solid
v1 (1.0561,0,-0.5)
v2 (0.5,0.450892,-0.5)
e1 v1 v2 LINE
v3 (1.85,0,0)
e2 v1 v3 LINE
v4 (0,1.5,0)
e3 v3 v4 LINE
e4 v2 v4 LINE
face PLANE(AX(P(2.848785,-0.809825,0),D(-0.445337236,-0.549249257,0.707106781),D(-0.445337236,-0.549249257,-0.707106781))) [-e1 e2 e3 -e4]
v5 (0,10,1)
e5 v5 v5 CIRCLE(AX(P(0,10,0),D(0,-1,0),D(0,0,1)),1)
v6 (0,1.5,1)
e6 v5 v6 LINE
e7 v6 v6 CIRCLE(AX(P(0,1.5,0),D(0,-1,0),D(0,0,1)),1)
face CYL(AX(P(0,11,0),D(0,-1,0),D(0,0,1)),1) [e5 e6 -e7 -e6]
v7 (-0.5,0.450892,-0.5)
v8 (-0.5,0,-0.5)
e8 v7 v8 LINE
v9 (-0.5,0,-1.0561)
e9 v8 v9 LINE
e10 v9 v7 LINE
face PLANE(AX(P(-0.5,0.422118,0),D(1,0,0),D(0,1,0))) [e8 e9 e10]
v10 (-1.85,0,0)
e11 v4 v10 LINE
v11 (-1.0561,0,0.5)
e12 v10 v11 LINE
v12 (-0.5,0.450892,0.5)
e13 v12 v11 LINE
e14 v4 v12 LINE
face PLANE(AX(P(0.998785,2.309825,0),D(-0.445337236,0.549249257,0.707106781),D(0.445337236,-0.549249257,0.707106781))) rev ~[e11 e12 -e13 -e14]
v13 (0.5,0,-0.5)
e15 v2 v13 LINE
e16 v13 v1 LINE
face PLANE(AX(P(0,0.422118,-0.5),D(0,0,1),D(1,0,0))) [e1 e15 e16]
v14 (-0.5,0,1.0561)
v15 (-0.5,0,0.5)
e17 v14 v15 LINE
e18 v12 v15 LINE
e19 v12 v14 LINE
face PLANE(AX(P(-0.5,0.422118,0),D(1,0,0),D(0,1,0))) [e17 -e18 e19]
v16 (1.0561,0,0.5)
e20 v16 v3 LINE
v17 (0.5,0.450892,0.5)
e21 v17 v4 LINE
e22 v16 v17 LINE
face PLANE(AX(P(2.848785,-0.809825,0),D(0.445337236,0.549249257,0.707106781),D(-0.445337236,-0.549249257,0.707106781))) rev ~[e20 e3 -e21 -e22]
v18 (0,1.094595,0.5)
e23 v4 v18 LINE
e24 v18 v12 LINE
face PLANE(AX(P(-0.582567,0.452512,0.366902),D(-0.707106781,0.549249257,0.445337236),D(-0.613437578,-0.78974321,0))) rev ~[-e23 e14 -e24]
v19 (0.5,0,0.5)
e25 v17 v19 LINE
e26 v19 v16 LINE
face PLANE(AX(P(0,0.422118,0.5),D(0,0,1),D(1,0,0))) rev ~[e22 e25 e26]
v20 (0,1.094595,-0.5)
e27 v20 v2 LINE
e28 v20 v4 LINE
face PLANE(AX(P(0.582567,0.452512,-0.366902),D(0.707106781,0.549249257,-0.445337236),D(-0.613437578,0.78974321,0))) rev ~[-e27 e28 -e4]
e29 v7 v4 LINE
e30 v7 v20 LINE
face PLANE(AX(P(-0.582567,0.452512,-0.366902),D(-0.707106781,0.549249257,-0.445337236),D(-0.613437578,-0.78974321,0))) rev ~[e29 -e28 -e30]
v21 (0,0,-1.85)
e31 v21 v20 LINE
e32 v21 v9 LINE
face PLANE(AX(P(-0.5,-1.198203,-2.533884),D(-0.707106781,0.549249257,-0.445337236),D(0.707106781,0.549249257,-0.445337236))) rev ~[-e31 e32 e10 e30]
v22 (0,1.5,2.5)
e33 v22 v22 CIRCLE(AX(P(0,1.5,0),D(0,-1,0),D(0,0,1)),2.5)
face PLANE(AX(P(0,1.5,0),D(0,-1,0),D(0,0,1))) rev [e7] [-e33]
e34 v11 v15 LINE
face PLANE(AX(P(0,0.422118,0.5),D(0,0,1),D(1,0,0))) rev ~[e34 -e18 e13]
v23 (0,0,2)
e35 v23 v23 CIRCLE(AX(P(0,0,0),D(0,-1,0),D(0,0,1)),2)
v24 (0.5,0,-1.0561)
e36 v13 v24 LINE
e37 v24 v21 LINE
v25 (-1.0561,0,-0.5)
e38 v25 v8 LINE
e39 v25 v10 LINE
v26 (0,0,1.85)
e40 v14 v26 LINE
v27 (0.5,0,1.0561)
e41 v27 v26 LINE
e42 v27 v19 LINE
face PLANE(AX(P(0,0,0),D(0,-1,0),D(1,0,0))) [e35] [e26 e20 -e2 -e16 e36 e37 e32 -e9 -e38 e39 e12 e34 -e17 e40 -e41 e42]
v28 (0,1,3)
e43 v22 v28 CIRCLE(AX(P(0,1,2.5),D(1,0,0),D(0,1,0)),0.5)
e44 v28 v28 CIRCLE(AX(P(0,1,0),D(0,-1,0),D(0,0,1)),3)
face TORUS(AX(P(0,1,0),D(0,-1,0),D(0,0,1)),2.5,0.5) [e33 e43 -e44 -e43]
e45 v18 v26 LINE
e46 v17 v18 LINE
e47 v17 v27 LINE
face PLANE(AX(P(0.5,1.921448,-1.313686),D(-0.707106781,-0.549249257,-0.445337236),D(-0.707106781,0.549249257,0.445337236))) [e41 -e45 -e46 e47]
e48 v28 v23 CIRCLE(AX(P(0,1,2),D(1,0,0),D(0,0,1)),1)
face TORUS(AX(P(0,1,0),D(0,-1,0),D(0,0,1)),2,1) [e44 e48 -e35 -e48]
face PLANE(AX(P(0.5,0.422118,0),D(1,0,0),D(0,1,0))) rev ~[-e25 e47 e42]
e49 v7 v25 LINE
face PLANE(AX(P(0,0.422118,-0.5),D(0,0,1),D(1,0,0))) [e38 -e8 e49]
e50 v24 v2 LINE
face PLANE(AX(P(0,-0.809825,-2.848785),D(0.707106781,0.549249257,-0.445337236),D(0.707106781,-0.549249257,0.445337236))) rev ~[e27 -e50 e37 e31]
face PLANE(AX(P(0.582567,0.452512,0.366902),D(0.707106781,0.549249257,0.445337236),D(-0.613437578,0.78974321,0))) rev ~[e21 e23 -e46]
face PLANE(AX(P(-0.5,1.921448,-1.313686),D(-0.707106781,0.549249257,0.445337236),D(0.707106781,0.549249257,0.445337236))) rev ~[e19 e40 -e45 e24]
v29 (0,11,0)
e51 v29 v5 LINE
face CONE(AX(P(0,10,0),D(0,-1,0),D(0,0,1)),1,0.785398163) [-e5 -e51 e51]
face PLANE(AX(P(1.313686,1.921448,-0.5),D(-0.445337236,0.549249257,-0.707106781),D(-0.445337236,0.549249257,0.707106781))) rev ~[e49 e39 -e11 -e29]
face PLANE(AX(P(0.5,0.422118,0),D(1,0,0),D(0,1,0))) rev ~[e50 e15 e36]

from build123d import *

# Parameters (mm, degrees)
F2_SIZE      = 1
F4_DEPTH     = 0.5
F5_T4_DEPTH  = 4.9533840607
F5_T10_DEPTH = 4.9533840607
F5_T16_DEPTH = 4.9533840607
F5_T22_DEPTH = 4.9533840607
F7_DEPTH     = 0.5
F8_T4_DEPTH  = 4.9533840607
F8_T10_DEPTH = 4.9533840607
F8_T16_DEPTH = 4.9533840607
F8_T22_DEPTH = 4.9533840607
F8_T28_DEPTH = 4.9533840607
F8_T34_DEPTH = 4.9533840607
F8_T40_DEPTH = 4.9533840607
F8_T46_DEPTH = 4.9533840607


# Not quite as in the source:
# - a fillet or chamfer that OpenCascade refuses, or shapes differently, is made with other operations: its cross-section is extruded or revolved along the edge and cut away or added


with BuildPart() as f1:
    # F0 (on Right) → F1 (revolve)
    with BuildSketch(Plane.YZ):
        with BuildLine():
            Line((0, 2), (0, 0))
            Line((0, 0), (11, 0))
            Line((11, 0), (11, 1))
            Line((11, 1), (1.5, 1))
            Line((1.5, 1), (1.5, 2.5))
            ThreePointArc((1.5, 2.5), (1.3535533906, 2.8535533906), (1, 3))
            ThreePointArc((1, 3), (0.2928932188, 2.7071067812), (0, 2))
        make_face()
    revolve(axis=Axis((0, -4.3078260496, 0), (0, -1, 0)))

    # F2
    f2_edges = [f1.edges().sort_by_distance(p)[0] for p in [
        (0, 11, -1),
    ]]
    chamfer(f2_edges, length=F2_SIZE)

    # F3 (on Right) → F4 (cut, symmetric)
    with BuildSketch(Plane.YZ):
        Polygon((1.5, 0), (0, 1.85), (0, -1.85), align=None)
    extrude(amount=F4_DEPTH, both=True, mode=Mode.SUBTRACT)

    # F5: chamfer of 0.5 on 4 edges, made by hand


with BuildPart() as f5_tool2:
    # F5_s3 → F5_t4 (new body)
    with BuildSketch(Plane(origin=(0, -1.7148497309, -2.1149813348), x_dir=(1, 0, 0), z_dir=(0, 0.6298019584, 0.7767557487))):
        Polygon((0, 1.1651336231), (0.5, 0.6651336231), (0.5, 1.1651336231), align=None)
    extrude(amount=F5_T4_DEPTH)

    split(bisect_by=Plane.XZ, keep=Keep.BOTTOM)

    split(bisect_by=Plane(origin=(0, 0.9050242398, 0.7338034376), x_dir=(1, 0, 0), z_dir=(0, -0.7767557487, -0.6298019584)), keep=Keep.TOP)


with BuildPart() as f1_1:
    add(f1.part)

    # F5_t1: union F5_tool2
    add(f5_tool2.part)


with BuildPart() as f5_tool8:
    # F5_s9 → F5_t10 (new body)
    with BuildSketch(Plane(origin=(0, -1.7148497309, -2.1149813348), x_dir=(1, 0, 0), z_dir=(0, 0.6298019584, 0.7767557487))):
        Polygon((-0.5, 0.6651336231), (0, 1.1651336231), (-0.5, 1.1651336231), align=None)
    extrude(amount=F5_T10_DEPTH)

    split(bisect_by=Plane.XZ, keep=Keep.BOTTOM)

    split(bisect_by=Plane(origin=(0, 0.9050242398, 0.7338034376), x_dir=(1, 0, 0), z_dir=(0, -0.7767557487, -0.6298019584)), keep=Keep.TOP)


with BuildPart() as f1_2:
    add(f1_1.part)

    # F5_t7: union F5_tool8
    add(f5_tool8.part)


with BuildPart() as f5_tool14:
    # F5_s15 → F5_t16 (new body)
    with BuildSketch(Plane(origin=(0, 1.4048012514, -1.73258821), x_dir=(1, 0, 0), z_dir=(0, -0.6298019584, 0.7767557487))):
        Polygon((-0.5, 0.6651336231), (0, 1.1651336231), (-0.5, 1.1651336231), align=None)
    extrude(amount=F5_T16_DEPTH)

    split(bisect_by=Plane.XZ, keep=Keep.BOTTOM)

    split(bisect_by=Plane(origin=(0, 0.9050242398, -0.7338034376), x_dir=(1, 0, 0), z_dir=(0, -0.7767557487, 0.6298019584)), keep=Keep.TOP)


with BuildPart() as f1_3:
    add(f1_2.part)

    # F5_t13: union F5_tool14
    add(f5_tool14.part)


with BuildPart() as f5_tool20:
    # F5_s21 → F5_t22 (new body)
    with BuildSketch(Plane(origin=(0, 1.4048012514, -1.73258821), x_dir=(1, 0, 0), z_dir=(0, -0.6298019584, 0.7767557487))):
        Polygon((0.5, 0.6651336231), (0, 1.1651336231), (0.5, 1.1651336231), align=None)
    extrude(amount=F5_T22_DEPTH)

    split(bisect_by=Plane.XZ, keep=Keep.BOTTOM)

    split(bisect_by=Plane(origin=(0, 0.9050242398, -0.7338034376), x_dir=(1, 0, 0), z_dir=(0, -0.7767557487, 0.6298019584)), keep=Keep.TOP)


with BuildPart() as f1_4:
    add(f1_3.part)

    # F5_t19: union F5_tool20
    add(f5_tool20.part)

    # F6 (on Top) → F7 (cut, symmetric)
    with BuildSketch(Plane.XY):
        Polygon((0, 1.5), (-1.85, 0), (1.85, 0), align=None)
    extrude(amount=F7_DEPTH, both=True, mode=Mode.SUBTRACT)

    # F8: chamfer of 0.5 on 4 edges, made by hand


with BuildPart() as f8_tool2:
    # F8_s3 → F8_t4 (new body)
    with BuildSketch(Plane(origin=(2.1149813348, -1.7148497309, 0), x_dir=(0, 0, 1), z_dir=(-0.7767557487, 0.6298019584, 0))):
        Polygon((0, 1.1651336231), (-0.5, 0.6651336231), (-0.5, 1.1651336231), align=None)
    extrude(amount=F8_T4_DEPTH)

    split(bisect_by=Plane.XZ, keep=Keep.BOTTOM)

    split(bisect_by=Plane(origin=(0.5825668116, 0.4525121199, -0.3669017188), x_dir=(-0.6134375783, 0.7897432099, 0), z_dir=(0.7071067812, 0.5492492572, -0.4453372356)), keep=Keep.TOP)


with BuildPart() as f1_5:
    add(f1_4.part)

    # F8_t1: union F8_tool2
    add(f8_tool2.part)


with BuildPart() as f8_tool8:
    # F8_s9 → F8_t10 (new body)
    with BuildSketch(Plane(origin=(2.1149813348, -1.7148497309, 0), x_dir=(0, 0, 1), z_dir=(-0.7767557487, 0.6298019584, 0))):
        Polygon((0, 1.1651336231), (-0.5, 0.6651336231), (-0.5, 1.1651336231), align=None)
    extrude(amount=F8_T10_DEPTH)

    split(bisect_by=Plane(origin=(-0.5825668116, 0.4525121199, -0.3669017188), x_dir=(-0.6134375783, -0.7897432099, 0), z_dir=(-0.7071067812, 0.5492492572, -0.4453372356)), keep=Keep.TOP)

    split(bisect_by=Plane(origin=(-0.7338034376, 0.9050242398, 0), x_dir=(0, 0, 1), z_dir=(0.6298019584, -0.7767557487, 0)), keep=Keep.TOP)


with BuildPart() as f1_6:
    add(f1_5.part)

    # F8_t7: union F8_tool8
    add(f8_tool8.part)


with BuildPart() as f8_tool14:
    # F8_s15 → F8_t16 (new body)
    with BuildSketch(Plane(origin=(1.73258821, 1.4048012514, 0), x_dir=(0, 0, 1), z_dir=(-0.7767557487, -0.6298019584, 0))):
        Polygon((-0.5, 0.6651336231), (0, 1.1651336231), (-0.5, 1.1651336231), align=None)
    extrude(amount=F8_T16_DEPTH)

    split(bisect_by=Plane(origin=(0.7338034376, 0.9050242398, 0), x_dir=(0, 0, 1), z_dir=(-0.6298019584, -0.7767557487, 0)), keep=Keep.TOP)

    split(bisect_by=Plane(origin=(0.5825668116, 0.4525121199, -0.3669017188), x_dir=(-0.6134375783, 0.7897432099, 0), z_dir=(0.7071067812, 0.5492492572, -0.4453372356)), keep=Keep.TOP)


with BuildPart() as f1_7:
    add(f1_6.part)

    # F8_t13: union F8_tool14
    add(f8_tool14.part)


with BuildPart() as f8_tool20:
    # F8_s21 → F8_t22 (new body)
    with BuildSketch(Plane(origin=(1.73258821, 1.4048012514, 0), x_dir=(0, 0, 1), z_dir=(-0.7767557487, -0.6298019584, 0))):
        Polygon((-0.5, 0.6651336231), (0, 1.1651336231), (-0.5, 1.1651336231), align=None)
    extrude(amount=F8_T22_DEPTH)

    split(bisect_by=Plane.XZ, keep=Keep.BOTTOM)

    split(bisect_by=Plane(origin=(-0.5825668116, 0.4525121199, -0.3669017188), x_dir=(-0.6134375783, -0.7897432099, 0), z_dir=(-0.7071067812, 0.5492492572, -0.4453372356)), keep=Keep.TOP)


with BuildPart() as f1_8:
    add(f1_7.part)

    # F8_t19: union F8_tool20
    add(f8_tool20.part)


with BuildPart() as f8_tool26:
    # F8_s27 → F8_t28 (new body)
    with BuildSketch(Plane(origin=(2.1149813348, -1.7148497309, 0), x_dir=(0, 0, 1), z_dir=(-0.7767557487, 0.6298019584, 0))):
        Polygon((0, 1.1651336231), (0.5, 0.6651336231), (0.5, 1.1651336231), align=None)
    extrude(amount=F8_T28_DEPTH)

    split(bisect_by=Plane.XZ, keep=Keep.BOTTOM)

    split(bisect_by=Plane(origin=(0.5825668116, 0.4525121199, 0.3669017188), x_dir=(-0.6134375783, 0.7897432099, 0), z_dir=(0.7071067812, 0.5492492572, 0.4453372356)), keep=Keep.TOP)


with BuildPart() as f1_9:
    add(f1_8.part)

    # F8_t25: union F8_tool26
    add(f8_tool26.part)


with BuildPart() as f8_tool32:
    # F8_s33 → F8_t34 (new body)
    with BuildSketch(Plane(origin=(2.1149813348, -1.7148497309, 0), x_dir=(0, 0, 1), z_dir=(-0.7767557487, 0.6298019584, 0))):
        Polygon((0, 1.1651336231), (0.5, 0.6651336231), (0.5, 1.1651336231), align=None)
    extrude(amount=F8_T34_DEPTH)

    split(bisect_by=Plane(origin=(-0.5825668116, 0.4525121199, 0.3669017188), x_dir=(-0.6134375783, -0.7897432099, 0), z_dir=(-0.7071067812, 0.5492492572, 0.4453372356)), keep=Keep.TOP)

    split(bisect_by=Plane(origin=(-0.7338034376, 0.9050242398, 0), x_dir=(0, 0, 1), z_dir=(0.6298019584, -0.7767557487, 0)), keep=Keep.TOP)


with BuildPart() as f1_10:
    add(f1_9.part)

    # F8_t31: union F8_tool32
    add(f8_tool32.part)


with BuildPart() as f8_tool38:
    # F8_s39 → F8_t40 (new body)
    with BuildSketch(Plane(origin=(1.73258821, 1.4048012514, 0), x_dir=(0, 0, 1), z_dir=(-0.7767557487, -0.6298019584, 0))):
        Polygon((0, 1.1651336231), (0.5, 0.6651336231), (0.5, 1.1651336231), align=None)
    extrude(amount=F8_T40_DEPTH)

    split(bisect_by=Plane(origin=(0.5825668116, 0.4525121199, 0.3669017188), x_dir=(-0.6134375783, 0.7897432099, 0), z_dir=(0.7071067812, 0.5492492572, 0.4453372356)), keep=Keep.TOP)

    split(bisect_by=Plane(origin=(0.7338034376, 0.9050242398, 0), x_dir=(0, 0, 1), z_dir=(-0.6298019584, -0.7767557487, 0)), keep=Keep.TOP)


with BuildPart() as f1_11:
    add(f1_10.part)

    # F8_t37: union F8_tool38
    add(f8_tool38.part)


with BuildPart() as f8_tool44:
    # F8_s45 → F8_t46 (new body)
    with BuildSketch(Plane(origin=(1.73258821, 1.4048012514, 0), x_dir=(0, 0, 1), z_dir=(-0.7767557487, -0.6298019584, 0))):
        Polygon((0, 1.1651336231), (0.5, 0.6651336231), (0.5, 1.1651336231), align=None)
    extrude(amount=F8_T46_DEPTH)

    split(bisect_by=Plane.XZ, keep=Keep.BOTTOM)

    split(bisect_by=Plane(origin=(-0.5825668116, 0.4525121199, 0.3669017188), x_dir=(-0.6134375783, -0.7897432099, 0), z_dir=(-0.7071067812, 0.5492492572, 0.4453372356)), keep=Keep.TOP)


with BuildPart() as f1_12:
    add(f1_11.part)

    # F8_t43: union F8_tool44
    add(f8_tool44.part)


solid = f1_12.part
